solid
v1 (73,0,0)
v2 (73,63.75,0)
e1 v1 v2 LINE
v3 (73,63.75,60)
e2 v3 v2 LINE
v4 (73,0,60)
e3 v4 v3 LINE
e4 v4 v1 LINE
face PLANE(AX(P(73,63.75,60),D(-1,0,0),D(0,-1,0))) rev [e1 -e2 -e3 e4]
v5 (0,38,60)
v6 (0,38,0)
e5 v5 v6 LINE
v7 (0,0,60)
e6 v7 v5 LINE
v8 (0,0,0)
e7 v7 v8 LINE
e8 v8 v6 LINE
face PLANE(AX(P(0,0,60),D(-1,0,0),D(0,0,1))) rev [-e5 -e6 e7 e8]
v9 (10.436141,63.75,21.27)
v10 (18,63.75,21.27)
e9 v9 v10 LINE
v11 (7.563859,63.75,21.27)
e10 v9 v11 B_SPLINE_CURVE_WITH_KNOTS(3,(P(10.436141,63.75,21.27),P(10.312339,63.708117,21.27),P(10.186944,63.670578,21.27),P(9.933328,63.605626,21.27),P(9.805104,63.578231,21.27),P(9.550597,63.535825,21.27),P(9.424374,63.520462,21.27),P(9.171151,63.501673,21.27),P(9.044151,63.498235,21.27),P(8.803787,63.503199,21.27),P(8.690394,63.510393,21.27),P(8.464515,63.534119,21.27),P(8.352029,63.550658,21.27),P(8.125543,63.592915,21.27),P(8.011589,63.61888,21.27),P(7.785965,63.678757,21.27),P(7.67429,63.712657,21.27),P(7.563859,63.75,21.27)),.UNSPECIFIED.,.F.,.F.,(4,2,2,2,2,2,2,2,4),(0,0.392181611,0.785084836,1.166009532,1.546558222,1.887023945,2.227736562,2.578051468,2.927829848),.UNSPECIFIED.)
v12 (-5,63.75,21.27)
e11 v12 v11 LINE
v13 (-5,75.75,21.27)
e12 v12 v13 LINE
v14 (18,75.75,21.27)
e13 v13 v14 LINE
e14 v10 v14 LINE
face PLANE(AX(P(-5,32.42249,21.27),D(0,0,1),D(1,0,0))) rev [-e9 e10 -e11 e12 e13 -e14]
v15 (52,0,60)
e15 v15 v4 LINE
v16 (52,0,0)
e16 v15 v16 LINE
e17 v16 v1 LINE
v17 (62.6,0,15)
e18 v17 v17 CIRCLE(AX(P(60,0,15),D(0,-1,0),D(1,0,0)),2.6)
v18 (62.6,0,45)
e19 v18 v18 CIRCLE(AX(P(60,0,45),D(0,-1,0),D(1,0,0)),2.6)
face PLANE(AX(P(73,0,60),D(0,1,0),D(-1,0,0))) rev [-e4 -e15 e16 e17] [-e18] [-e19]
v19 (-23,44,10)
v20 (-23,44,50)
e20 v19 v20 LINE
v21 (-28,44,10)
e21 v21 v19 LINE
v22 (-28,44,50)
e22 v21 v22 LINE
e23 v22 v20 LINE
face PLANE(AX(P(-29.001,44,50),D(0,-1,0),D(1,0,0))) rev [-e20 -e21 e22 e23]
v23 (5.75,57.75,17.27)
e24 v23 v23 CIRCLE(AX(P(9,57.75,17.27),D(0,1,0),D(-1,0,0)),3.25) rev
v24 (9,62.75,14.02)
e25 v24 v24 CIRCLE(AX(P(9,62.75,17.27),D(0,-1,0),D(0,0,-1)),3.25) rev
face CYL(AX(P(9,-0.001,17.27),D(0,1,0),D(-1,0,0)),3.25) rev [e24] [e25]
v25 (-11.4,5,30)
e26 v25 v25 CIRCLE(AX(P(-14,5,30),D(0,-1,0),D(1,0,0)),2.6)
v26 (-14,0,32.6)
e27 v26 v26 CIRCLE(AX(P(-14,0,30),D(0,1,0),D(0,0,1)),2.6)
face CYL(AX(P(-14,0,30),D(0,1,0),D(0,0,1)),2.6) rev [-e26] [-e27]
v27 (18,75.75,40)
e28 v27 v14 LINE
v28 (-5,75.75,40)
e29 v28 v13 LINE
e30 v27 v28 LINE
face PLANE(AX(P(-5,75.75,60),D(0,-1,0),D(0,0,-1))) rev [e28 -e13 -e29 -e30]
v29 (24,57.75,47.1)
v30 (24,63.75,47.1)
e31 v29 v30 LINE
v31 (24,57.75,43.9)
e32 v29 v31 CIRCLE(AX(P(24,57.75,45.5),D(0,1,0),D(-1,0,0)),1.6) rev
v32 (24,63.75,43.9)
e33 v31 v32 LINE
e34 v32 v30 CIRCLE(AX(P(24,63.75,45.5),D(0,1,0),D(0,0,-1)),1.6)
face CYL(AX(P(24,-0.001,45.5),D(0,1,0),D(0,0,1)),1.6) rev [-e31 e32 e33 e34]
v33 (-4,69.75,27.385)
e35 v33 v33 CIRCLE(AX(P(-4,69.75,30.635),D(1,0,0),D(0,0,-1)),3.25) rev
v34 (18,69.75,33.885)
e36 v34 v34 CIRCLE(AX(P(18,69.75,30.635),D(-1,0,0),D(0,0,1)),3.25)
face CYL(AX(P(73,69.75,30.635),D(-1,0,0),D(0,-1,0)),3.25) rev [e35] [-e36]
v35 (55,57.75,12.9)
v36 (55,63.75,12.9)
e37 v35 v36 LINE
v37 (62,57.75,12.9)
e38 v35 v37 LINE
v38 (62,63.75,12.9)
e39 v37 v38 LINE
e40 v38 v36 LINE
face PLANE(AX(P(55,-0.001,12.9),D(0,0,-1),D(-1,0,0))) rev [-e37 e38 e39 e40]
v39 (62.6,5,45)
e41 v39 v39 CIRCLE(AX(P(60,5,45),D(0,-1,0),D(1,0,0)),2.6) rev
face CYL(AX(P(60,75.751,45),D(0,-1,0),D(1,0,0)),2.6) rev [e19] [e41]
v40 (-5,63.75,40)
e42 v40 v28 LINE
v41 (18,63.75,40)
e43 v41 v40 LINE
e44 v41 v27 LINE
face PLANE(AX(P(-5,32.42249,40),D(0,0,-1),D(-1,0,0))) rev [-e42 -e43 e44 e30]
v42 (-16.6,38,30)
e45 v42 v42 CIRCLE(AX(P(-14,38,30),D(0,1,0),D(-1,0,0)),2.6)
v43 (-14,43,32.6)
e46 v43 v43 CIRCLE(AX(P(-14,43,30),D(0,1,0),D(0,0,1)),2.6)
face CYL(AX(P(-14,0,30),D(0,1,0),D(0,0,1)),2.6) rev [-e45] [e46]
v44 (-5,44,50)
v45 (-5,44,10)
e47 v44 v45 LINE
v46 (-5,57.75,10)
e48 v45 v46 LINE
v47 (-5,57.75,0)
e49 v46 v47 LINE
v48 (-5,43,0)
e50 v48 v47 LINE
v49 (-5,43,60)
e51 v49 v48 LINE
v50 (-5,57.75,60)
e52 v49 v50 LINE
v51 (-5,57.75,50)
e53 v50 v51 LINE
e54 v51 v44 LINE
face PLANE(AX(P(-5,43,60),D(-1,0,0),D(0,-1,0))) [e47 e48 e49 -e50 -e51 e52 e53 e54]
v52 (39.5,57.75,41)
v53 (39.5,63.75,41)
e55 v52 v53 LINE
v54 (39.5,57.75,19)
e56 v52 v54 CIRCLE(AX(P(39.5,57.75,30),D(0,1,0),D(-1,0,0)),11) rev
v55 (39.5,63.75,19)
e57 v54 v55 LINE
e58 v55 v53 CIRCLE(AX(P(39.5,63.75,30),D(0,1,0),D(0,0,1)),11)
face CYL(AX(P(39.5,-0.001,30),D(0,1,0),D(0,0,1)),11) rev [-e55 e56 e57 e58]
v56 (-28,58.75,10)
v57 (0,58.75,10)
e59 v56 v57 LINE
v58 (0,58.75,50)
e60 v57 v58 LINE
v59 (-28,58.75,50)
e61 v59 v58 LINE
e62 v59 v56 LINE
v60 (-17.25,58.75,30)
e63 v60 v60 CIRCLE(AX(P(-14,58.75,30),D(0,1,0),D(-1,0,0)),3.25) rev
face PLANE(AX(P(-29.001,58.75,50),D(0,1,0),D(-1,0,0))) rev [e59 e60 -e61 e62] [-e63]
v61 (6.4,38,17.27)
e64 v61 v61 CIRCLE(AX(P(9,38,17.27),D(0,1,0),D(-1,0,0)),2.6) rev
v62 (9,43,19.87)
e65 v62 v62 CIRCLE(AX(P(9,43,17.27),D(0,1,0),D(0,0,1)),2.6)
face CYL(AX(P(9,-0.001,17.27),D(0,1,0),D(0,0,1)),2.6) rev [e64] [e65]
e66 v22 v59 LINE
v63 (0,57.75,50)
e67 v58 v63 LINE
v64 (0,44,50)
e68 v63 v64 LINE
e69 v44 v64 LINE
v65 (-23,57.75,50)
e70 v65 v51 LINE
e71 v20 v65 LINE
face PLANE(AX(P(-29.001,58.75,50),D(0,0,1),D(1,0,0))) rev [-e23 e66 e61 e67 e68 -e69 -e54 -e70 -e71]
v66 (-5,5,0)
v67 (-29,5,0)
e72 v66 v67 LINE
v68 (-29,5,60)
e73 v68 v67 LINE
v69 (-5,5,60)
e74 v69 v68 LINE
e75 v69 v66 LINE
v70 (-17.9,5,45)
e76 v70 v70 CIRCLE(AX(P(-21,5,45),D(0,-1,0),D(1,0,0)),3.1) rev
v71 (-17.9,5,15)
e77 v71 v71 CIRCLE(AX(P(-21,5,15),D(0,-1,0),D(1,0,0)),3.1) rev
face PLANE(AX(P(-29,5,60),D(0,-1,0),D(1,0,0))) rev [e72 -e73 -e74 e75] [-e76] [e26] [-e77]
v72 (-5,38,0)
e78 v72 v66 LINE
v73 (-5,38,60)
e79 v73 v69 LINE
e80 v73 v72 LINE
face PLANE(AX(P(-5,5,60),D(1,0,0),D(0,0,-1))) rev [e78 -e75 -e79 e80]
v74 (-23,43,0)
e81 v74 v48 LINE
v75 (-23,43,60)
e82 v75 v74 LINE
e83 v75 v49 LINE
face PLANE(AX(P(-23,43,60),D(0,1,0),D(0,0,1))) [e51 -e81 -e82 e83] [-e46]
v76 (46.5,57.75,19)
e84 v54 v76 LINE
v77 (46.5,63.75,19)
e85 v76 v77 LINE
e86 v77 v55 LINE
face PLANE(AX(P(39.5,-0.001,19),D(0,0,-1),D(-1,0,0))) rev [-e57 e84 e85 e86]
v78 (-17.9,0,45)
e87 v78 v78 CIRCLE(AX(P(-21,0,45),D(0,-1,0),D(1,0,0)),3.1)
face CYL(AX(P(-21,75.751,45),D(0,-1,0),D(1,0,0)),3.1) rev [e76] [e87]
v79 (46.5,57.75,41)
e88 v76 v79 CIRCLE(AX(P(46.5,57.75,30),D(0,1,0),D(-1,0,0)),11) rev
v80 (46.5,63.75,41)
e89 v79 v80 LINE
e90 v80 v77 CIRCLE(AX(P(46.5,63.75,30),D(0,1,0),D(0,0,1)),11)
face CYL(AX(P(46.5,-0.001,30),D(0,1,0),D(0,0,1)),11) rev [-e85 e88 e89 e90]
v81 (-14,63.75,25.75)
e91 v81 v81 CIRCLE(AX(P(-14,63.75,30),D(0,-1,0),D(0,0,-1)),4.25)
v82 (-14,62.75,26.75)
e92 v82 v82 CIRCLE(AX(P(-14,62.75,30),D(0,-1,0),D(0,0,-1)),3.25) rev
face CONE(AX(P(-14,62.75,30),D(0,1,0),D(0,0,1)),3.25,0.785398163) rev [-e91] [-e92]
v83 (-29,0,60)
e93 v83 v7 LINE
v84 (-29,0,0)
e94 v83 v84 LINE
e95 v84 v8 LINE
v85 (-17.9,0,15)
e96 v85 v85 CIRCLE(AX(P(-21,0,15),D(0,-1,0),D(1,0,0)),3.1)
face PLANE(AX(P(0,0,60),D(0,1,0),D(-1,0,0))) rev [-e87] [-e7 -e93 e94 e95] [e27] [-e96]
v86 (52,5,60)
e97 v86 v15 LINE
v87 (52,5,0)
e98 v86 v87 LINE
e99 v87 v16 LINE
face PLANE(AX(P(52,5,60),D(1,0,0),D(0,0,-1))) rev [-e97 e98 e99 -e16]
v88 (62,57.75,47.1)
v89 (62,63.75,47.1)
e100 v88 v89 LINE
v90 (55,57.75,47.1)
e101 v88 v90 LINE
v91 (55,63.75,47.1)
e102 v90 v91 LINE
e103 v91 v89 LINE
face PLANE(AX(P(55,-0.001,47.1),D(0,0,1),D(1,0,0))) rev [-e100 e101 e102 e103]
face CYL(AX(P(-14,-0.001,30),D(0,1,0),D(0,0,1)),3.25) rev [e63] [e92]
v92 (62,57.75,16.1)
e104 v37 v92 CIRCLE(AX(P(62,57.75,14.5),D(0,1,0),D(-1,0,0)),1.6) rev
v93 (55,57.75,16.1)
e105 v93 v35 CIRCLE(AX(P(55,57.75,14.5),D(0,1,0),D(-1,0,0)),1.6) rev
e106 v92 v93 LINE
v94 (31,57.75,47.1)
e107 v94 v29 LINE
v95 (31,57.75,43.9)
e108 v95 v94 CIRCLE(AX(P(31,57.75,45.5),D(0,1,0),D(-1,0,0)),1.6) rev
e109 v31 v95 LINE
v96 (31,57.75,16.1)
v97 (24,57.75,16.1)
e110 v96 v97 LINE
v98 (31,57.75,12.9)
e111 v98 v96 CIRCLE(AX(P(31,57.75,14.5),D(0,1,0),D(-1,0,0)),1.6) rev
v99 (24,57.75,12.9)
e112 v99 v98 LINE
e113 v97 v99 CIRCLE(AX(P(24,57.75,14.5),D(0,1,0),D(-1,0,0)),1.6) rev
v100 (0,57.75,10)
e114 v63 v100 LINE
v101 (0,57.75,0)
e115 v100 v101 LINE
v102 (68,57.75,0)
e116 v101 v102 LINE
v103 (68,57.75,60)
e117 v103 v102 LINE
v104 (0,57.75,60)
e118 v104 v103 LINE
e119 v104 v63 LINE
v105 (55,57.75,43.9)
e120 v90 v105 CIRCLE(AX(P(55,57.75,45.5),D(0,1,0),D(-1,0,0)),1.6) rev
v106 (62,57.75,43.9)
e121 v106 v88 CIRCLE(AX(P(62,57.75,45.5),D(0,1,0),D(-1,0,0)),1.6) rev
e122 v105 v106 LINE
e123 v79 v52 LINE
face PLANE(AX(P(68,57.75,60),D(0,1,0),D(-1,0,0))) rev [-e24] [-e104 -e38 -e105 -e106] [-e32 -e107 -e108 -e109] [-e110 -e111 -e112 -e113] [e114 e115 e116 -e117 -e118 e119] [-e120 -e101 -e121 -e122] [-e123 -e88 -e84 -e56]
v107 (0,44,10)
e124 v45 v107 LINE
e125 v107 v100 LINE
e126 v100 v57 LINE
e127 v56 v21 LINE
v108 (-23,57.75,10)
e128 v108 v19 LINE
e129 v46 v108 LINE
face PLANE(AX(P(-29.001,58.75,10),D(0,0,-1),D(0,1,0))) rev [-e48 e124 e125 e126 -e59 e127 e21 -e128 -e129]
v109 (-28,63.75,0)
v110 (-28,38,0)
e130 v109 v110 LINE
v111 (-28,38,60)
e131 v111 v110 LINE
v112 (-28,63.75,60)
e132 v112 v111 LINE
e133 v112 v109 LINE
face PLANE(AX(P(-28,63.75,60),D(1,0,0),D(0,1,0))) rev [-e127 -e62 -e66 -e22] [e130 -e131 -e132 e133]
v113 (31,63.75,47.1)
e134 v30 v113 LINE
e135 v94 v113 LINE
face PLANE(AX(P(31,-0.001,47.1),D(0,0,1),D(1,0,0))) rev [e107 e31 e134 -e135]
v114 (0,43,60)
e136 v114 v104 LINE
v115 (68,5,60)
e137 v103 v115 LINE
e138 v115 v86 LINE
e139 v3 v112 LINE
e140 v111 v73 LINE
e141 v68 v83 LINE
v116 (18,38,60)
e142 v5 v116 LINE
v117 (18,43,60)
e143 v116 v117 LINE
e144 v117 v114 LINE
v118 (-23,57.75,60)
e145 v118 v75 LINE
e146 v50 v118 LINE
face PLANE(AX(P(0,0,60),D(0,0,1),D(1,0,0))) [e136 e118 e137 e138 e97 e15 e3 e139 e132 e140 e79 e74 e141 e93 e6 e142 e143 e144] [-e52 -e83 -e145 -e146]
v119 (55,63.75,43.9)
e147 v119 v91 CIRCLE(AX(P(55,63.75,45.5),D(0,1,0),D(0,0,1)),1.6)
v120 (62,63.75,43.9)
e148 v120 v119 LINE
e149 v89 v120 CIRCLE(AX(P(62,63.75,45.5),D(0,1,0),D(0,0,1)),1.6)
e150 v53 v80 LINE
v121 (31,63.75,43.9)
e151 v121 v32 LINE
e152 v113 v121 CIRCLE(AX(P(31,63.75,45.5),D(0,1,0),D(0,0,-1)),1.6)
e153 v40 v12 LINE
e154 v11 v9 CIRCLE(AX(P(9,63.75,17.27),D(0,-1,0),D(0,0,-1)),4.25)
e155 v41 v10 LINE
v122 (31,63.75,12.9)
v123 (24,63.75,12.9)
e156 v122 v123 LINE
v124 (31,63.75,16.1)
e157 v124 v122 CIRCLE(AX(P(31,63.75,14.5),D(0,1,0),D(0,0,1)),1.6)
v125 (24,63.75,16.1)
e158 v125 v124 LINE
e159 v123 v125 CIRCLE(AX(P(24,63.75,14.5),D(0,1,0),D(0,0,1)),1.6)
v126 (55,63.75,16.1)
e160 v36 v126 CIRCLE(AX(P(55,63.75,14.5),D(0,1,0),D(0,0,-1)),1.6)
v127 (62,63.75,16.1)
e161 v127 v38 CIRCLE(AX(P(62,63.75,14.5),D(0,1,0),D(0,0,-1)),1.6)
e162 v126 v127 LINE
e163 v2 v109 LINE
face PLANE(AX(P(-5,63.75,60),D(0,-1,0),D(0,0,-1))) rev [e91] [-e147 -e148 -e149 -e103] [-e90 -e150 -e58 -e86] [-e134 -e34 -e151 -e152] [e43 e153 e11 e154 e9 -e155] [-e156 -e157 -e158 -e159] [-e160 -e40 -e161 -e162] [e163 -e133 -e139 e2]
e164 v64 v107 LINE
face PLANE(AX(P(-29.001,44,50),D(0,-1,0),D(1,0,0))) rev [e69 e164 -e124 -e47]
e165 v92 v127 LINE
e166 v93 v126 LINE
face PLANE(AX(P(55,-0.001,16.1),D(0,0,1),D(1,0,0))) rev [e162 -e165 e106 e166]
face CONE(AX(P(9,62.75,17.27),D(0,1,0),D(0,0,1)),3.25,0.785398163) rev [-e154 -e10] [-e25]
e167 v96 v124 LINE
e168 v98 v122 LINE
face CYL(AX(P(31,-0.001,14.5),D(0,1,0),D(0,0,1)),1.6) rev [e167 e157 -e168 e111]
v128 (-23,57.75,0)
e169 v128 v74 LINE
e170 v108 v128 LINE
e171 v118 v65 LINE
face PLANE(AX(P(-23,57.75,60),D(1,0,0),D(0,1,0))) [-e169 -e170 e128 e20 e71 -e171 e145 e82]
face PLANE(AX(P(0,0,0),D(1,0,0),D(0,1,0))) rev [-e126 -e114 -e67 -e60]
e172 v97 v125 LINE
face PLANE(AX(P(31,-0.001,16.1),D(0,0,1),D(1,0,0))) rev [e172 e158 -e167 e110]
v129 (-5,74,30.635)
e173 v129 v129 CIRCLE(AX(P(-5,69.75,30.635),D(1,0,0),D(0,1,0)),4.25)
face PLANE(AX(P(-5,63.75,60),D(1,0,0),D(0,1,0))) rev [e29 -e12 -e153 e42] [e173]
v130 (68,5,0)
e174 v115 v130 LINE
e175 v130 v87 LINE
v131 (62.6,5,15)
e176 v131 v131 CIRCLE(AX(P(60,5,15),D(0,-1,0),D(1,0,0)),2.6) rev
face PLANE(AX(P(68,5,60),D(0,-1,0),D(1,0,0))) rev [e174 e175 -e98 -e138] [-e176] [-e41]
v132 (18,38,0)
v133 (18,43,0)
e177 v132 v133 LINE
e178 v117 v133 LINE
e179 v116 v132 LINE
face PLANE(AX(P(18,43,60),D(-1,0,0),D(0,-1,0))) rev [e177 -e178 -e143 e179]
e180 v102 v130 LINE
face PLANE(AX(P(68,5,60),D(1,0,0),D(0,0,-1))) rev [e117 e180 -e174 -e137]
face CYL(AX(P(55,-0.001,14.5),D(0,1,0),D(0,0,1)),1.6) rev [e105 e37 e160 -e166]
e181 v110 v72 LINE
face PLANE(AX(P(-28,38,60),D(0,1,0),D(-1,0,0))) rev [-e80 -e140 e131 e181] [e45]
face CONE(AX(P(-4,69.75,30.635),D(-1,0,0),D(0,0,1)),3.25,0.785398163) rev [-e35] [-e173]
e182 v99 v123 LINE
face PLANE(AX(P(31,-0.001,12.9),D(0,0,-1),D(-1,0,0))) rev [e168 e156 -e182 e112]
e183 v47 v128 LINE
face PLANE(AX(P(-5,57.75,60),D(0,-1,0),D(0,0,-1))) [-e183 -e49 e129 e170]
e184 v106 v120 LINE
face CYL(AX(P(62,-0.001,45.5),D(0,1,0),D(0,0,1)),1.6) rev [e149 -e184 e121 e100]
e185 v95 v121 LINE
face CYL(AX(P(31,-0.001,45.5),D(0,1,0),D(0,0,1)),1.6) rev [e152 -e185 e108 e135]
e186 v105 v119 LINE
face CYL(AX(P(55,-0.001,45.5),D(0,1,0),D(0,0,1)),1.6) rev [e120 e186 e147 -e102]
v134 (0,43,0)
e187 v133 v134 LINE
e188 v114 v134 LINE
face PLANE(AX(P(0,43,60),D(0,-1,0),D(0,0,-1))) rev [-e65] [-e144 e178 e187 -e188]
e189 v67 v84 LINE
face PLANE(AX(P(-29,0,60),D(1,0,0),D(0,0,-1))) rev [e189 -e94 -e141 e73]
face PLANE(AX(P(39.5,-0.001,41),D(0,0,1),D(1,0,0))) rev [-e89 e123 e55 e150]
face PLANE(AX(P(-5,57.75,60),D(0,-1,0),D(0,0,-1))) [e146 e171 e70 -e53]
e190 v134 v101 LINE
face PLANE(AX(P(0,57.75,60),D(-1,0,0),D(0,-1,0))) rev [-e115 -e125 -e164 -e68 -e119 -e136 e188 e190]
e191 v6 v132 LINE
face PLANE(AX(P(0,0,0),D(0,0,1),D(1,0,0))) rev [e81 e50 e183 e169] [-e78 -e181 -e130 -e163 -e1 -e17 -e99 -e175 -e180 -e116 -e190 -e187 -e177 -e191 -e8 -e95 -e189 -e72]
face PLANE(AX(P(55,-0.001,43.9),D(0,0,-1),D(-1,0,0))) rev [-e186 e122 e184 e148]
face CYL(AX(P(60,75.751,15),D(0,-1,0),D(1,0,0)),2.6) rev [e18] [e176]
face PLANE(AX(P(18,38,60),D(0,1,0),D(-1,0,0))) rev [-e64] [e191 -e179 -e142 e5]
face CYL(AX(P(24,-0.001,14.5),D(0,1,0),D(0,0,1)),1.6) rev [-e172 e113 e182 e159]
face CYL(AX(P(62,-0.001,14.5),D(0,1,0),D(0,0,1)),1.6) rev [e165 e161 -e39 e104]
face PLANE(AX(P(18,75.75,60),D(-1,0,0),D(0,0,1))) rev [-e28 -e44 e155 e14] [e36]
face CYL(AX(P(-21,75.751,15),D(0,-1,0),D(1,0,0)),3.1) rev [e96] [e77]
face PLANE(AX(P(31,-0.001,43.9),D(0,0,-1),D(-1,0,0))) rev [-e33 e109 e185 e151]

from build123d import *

# Parameters (mm, degrees)
SKETCH1_W           = 18
SKETCH1_H           = 14.75
BOSS_EXTRUDE1_DEPTH = 60
CUT_EXTRUDE1_REACH  = 123.108
SKETCH2_W           = 40
SKETCH2_H           = 14.75
CUT_EXTRUDE2_REACH  = 115.987
CUT_EXTRUDE3_REACH  = 123.108
SKETCH5_R           = 3.25
CUT_EXTRUDE4_REACH  = 105.817
SKETCH6_R           = 2.6
SKETCH7_R           = 2.6
CUT_EXTRUDE5_DEPTH  = 114.9871155
CUT_EXTRUDE6_REACH  = 115.987
SKETCH8_R           = 3.25
SKETCH9_W           = 23
SKETCH9_H           = 21.27
SKETCH9_H_2         = 20
CUT_EXTRUDE7_DEPTH  = 12
CHAMFER1_SIZE       = 1
CUT_EXTRUDE8_REACH  = 123.108
SKETCH10_R          = 3.1
SKETCH10_R_2        = 2.6
SKETCH11_R          = 3.25
CUT_EXTRUDE9_DEPTH  = 125.185596991
CHAMFER2_SIZE       = 1


with BuildPart() as part:
    # Sketch1 → Boss-Extrude1 (new body)
    with BuildSketch(Plane.XY):
        Polygon((0, 0), (-29, 0), (-29, 5), (-5, 5), (-5, 38), (-28, 38), (-28, 63.75), (-5, 63.75), (-5, 75.75), (18, 75.75), (18, 63.75), (73, 63.75), (73, 0), (52, 0), (52, 5), (68, 5), (68, 57.75), (0, 57.75), (0, 43), (18, 43), (18, 38), (0, 38), align=None)
        with Locations((-14, 50.375)):
            Rectangle(SKETCH1_W, SKETCH1_H, mode=Mode.SUBTRACT)
    extrude(amount=BOSS_EXTRUDE1_DEPTH)

    # Sketch2 → Cut-Extrude1 (cut, up to next)
    with BuildSketch(Plane(origin=(0, 0, 0), x_dir=(0, 0, -1), z_dir=(1, 0, 0)), mode=Mode.PRIVATE) as cut_extrude1_sk1:
        with Locations((-30, 51.375)):
            Rectangle(SKETCH2_W, SKETCH2_H)
    cut_extrude1_tool1 = extrude(cut_extrude1_sk1.sketch, amount=-CUT_EXTRUDE1_REACH, mode=Mode.PRIVATE) & part.part
    add(cut_extrude1_tool1.solids().sort_by_distance((0, 51.375, 30))[0], mode=Mode.SUBTRACT)

    # Sketch3 → Cut-Extrude2 (cut, up to next)
    with BuildSketch(Plane(origin=(0, 63.75, 0), x_dir=(1, 0, 0), z_dir=(0, 1, 0)), mode=Mode.PRIVATE) as cut_extrude2_sk1:
        with BuildLine():
            Line((39.5, -19), (46.5, -19))
            ThreePointArc((46.5, -19), (57.5, -30), (46.5, -41))
            Line((46.5, -41), (39.5, -41))
            ThreePointArc((39.5, -41), (28.5, -30), (39.5, -19))
        make_face()
    cut_extrude2_tool1 = extrude(cut_extrude2_sk1.sketch, amount=-CUT_EXTRUDE2_REACH, mode=Mode.PRIVATE) & part.part
    # Sketch3 → Cut-Extrude2 (cut, up to next)
    with BuildSketch(Plane(origin=(0, 63.75, 0), x_dir=(1, 0, 0), z_dir=(0, 1, 0)), mode=Mode.PRIVATE) as cut_extrude2_sk2:
        with BuildLine():
            Line((31, -16.1), (24, -16.1))
            ThreePointArc((24, -16.1), (22.4, -14.5), (24, -12.9))
            Line((24, -12.9), (31, -12.9))
            ThreePointArc((31, -12.9), (32.6, -14.5), (31, -16.1))
        make_face()
    cut_extrude2_tool2 = extrude(cut_extrude2_sk2.sketch, amount=-CUT_EXTRUDE2_REACH, mode=Mode.PRIVATE) & part.part
    # Sketch3 → Cut-Extrude2 (cut, up to next)
    with BuildSketch(Plane(origin=(0, 63.75, 0), x_dir=(1, 0, 0), z_dir=(0, 1, 0)), mode=Mode.PRIVATE) as cut_extrude2_sk3:
        with BuildLine():
            Line((55, -16.1), (62, -16.1))
            ThreePointArc((62, -16.1), (63.6, -14.5), (62, -12.9))
            Line((62, -12.9), (55, -12.9))
            ThreePointArc((55, -12.9), (53.4, -14.5), (55, -16.1))
        make_face()
    cut_extrude2_tool3 = extrude(cut_extrude2_sk3.sketch, amount=-CUT_EXTRUDE2_REACH, mode=Mode.PRIVATE) & part.part
    # Sketch3 → Cut-Extrude2 (cut, up to next)
    with BuildSketch(Plane(origin=(0, 63.75, 0), x_dir=(1, 0, 0), z_dir=(0, 1, 0)), mode=Mode.PRIVATE) as cut_extrude2_sk4:
        with BuildLine():
            Line((31, -43.9), (24, -43.9))
            ThreePointArc((24, -43.9), (22.4, -45.5), (24, -47.1))
            Line((24, -47.1), (31, -47.1))
            ThreePointArc((31, -47.1), (32.6, -45.5), (31, -43.9))
        make_face()
    cut_extrude2_tool4 = extrude(cut_extrude2_sk4.sketch, amount=-CUT_EXTRUDE2_REACH, mode=Mode.PRIVATE) & part.part
    # Sketch3 → Cut-Extrude2 (cut, up to next)
    with BuildSketch(Plane(origin=(0, 63.75, 0), x_dir=(1, 0, 0), z_dir=(0, 1, 0)), mode=Mode.PRIVATE) as cut_extrude2_sk5:
        with BuildLine():
            Line((55, -43.9), (62, -43.9))
            ThreePointArc((62, -43.9), (63.6, -45.5), (62, -47.1))
            Line((62, -47.1), (55, -47.1))
            ThreePointArc((55, -47.1), (53.4, -45.5), (55, -43.9))
        make_face()
    cut_extrude2_tool5 = extrude(cut_extrude2_sk5.sketch, amount=-CUT_EXTRUDE2_REACH, mode=Mode.PRIVATE) & part.part
    add(cut_extrude2_tool1.solids().sort_by_distance((43, 63.75, 30))[0], mode=Mode.SUBTRACT)
    add(cut_extrude2_tool2.solids().sort_by_distance((27.5, 63.75, 14.5))[0], mode=Mode.SUBTRACT)
    add(cut_extrude2_tool3.solids().sort_by_distance((58.5, 63.75, 14.5))[0], mode=Mode.SUBTRACT)
    add(cut_extrude2_tool4.solids().sort_by_distance((27.5, 63.75, 45.5))[0], mode=Mode.SUBTRACT)
    add(cut_extrude2_tool5.solids().sort_by_distance((58.5, 63.75, 45.5))[0], mode=Mode.SUBTRACT)

    # Sketch5 → Cut-Extrude3 (cut, up to next)
    with BuildSketch(Plane(origin=(0, 75.75, 0), x_dir=(1, 0, 0), z_dir=(0, 1, 0)), mode=Mode.PRIVATE) as cut_extrude3_sk1:
        with Locations(Location((9, -17.27, 0), (0, 0, 180))):
            Circle(SKETCH5_R)
    cut_extrude3_tool1 = extrude(cut_extrude3_sk1.sketch, amount=-CUT_EXTRUDE3_REACH, mode=Mode.PRIVATE) & part.part
    add(cut_extrude3_tool1.solids().sort_by_distance((9, 75.75, 17.27))[0], mode=Mode.SUBTRACT)

    # Sketch6 → Cut-Extrude4 (cut, up to next)
    with BuildSketch(Plane(origin=(0, 43, 0), x_dir=(1, 0, 0), z_dir=(0, 1, 0)), mode=Mode.PRIVATE) as cut_extrude4_sk1:
        with Locations(Location((9, -17.27, 0), (0, 0, 270))):
            Circle(SKETCH6_R)
    cut_extrude4_tool1 = extrude(cut_extrude4_sk1.sketch, amount=-CUT_EXTRUDE4_REACH, mode=Mode.PRIVATE) & part.part
    add(cut_extrude4_tool1.solids().sort_by_distance((9, 43, 17.27))[0], mode=Mode.SUBTRACT)

    # Sketch7 → Cut-Extrude5 (cut, through all)
    with BuildSketch(Plane(origin=(0, 63.75, 0), x_dir=(1, 0, 0), z_dir=(0, 1, 0))):
        with Locations(Location((-14, -30, 0), (0, 0, 270))):
            Circle(SKETCH7_R)
    extrude(amount=-CUT_EXTRUDE5_DEPTH, mode=Mode.SUBTRACT)

    # Sketch8 → Cut-Extrude6 (cut, up to next)
    with BuildSketch(Plane(origin=(0, 63.75, 0), x_dir=(1, 0, 0), z_dir=(0, 1, 0)), mode=Mode.PRIVATE) as cut_extrude6_sk1:
        with Locations(Location((-14, -30, 0), (0, 0, 270))):
            Circle(SKETCH8_R)
    cut_extrude6_tool1 = extrude(cut_extrude6_sk1.sketch, amount=-CUT_EXTRUDE6_REACH, mode=Mode.PRIVATE) & part.part
    add(cut_extrude6_tool1.solids().sort_by_distance((-14, 63.75, 30))[0], mode=Mode.SUBTRACT)

    # Sketch9 → Cut-Extrude7 (cut)
    with BuildSketch(Plane(origin=(0, 75.75, 0), x_dir=(1, 0, 0), z_dir=(0, 1, 0))):
        with Locations((6.5, -10.635)):
            Rectangle(SKETCH9_W, SKETCH9_H)
        with Locations((6.5, -50)):
            Rectangle(SKETCH9_W, SKETCH9_H_2)
    extrude(amount=-CUT_EXTRUDE7_DEPTH, mode=Mode.SUBTRACT)

    # Chamfer1
    # the kernel refuses this chamfer: 1 mm, written as the material it takes off along each edge
    with BuildSketch(Plane(origin=(-14, 63.75, 30), x_dir=(0, 0, 1), z_dir=(-1, 0, 0))) as chamfer1_piece_1:
        Polygon((3.25, -CHAMFER1_SIZE), (3.25 + CHAMFER1_SIZE, 0), (3.25, 0), align=None)
    revolve(axis=Axis((-14, 63.75, 30), (0, 1, 0)), mode=Mode.SUBTRACT)
    with BuildSketch(Plane(origin=(9, 63.75, 17.27), x_dir=(-1, 0, 0), z_dir=(0, 0, -1))) as chamfer1_piece_2_section:
        Polygon((3.25 + CHAMFER1_SIZE, 0), (3.25, -CHAMFER1_SIZE), (3.25, 0), align=None)
    chamfer1_piece_2 = revolve(axis=Axis((9, 63.75, 17.27), (0, 1, 0)), mode=Mode.PRIVATE)
    chamfer1_piece_2 = split(chamfer1_piece_2, bisect_by=Plane(origin=(12.733674615, 63.266325385, 21.27), z_dir=(0, 0, -1)), keep=Keep.TOP, mode=Mode.PRIVATE)
    add(chamfer1_piece_2, mode=Mode.SUBTRACT)

    # Sketch10 → Cut-Extrude8 (cut, up to next)
    with BuildSketch(Plane.XZ, mode=Mode.PRIVATE) as cut_extrude8_sk1:
        with Locations((-21, 45)):
            Circle(SKETCH10_R)
    cut_extrude8_tool1 = extrude(cut_extrude8_sk1.sketch, amount=-CUT_EXTRUDE8_REACH, mode=Mode.PRIVATE) & part.part
    # Sketch10 → Cut-Extrude8 (cut, up to next)
    with BuildSketch(Plane.XZ, mode=Mode.PRIVATE) as cut_extrude8_sk2:
        with Locations((-21, 15)):
            Circle(SKETCH10_R)
    cut_extrude8_tool2 = extrude(cut_extrude8_sk2.sketch, amount=-CUT_EXTRUDE8_REACH, mode=Mode.PRIVATE) & part.part
    # Sketch10 → Cut-Extrude8 (cut, up to next)
    with BuildSketch(Plane.XZ, mode=Mode.PRIVATE) as cut_extrude8_sk3:
        with Locations((60, 15)):
            Circle(SKETCH10_R_2)
    cut_extrude8_tool3 = extrude(cut_extrude8_sk3.sketch, amount=-CUT_EXTRUDE8_REACH, mode=Mode.PRIVATE) & part.part
    # Sketch10 → Cut-Extrude8 (cut, up to next)
    with BuildSketch(Plane.XZ, mode=Mode.PRIVATE) as cut_extrude8_sk4:
        with Locations((60, 45)):
            Circle(SKETCH10_R_2)
    cut_extrude8_tool4 = extrude(cut_extrude8_sk4.sketch, amount=-CUT_EXTRUDE8_REACH, mode=Mode.PRIVATE) & part.part
    add(cut_extrude8_tool1.solids().sort_by_distance((-21, 0, 45))[0], mode=Mode.SUBTRACT)
    add(cut_extrude8_tool2.solids().sort_by_distance((-21, 0, 15))[0], mode=Mode.SUBTRACT)
    add(cut_extrude8_tool3.solids().sort_by_distance((60, 0, 15))[0], mode=Mode.SUBTRACT)
    add(cut_extrude8_tool4.solids().sort_by_distance((60, 0, 45))[0], mode=Mode.SUBTRACT)

    # Sketch11 → Cut-Extrude9 (cut, through all)
    with BuildSketch(Plane.ZY.offset(5)):
        with Locations(Location((30.635, 69.75, 0), (0, 0, 270))):
            Circle(SKETCH11_R)
    extrude(amount=-CUT_EXTRUDE9_DEPTH, mode=Mode.SUBTRACT)

    # Chamfer2
    chamfer2_edges = [part.edges().sort_by_distance(p)[0] for p in [
        (-5, 73, 30.635),
    ]]
    chamfer(chamfer2_edges, length=CHAMFER2_SIZE)


solid = part.part
